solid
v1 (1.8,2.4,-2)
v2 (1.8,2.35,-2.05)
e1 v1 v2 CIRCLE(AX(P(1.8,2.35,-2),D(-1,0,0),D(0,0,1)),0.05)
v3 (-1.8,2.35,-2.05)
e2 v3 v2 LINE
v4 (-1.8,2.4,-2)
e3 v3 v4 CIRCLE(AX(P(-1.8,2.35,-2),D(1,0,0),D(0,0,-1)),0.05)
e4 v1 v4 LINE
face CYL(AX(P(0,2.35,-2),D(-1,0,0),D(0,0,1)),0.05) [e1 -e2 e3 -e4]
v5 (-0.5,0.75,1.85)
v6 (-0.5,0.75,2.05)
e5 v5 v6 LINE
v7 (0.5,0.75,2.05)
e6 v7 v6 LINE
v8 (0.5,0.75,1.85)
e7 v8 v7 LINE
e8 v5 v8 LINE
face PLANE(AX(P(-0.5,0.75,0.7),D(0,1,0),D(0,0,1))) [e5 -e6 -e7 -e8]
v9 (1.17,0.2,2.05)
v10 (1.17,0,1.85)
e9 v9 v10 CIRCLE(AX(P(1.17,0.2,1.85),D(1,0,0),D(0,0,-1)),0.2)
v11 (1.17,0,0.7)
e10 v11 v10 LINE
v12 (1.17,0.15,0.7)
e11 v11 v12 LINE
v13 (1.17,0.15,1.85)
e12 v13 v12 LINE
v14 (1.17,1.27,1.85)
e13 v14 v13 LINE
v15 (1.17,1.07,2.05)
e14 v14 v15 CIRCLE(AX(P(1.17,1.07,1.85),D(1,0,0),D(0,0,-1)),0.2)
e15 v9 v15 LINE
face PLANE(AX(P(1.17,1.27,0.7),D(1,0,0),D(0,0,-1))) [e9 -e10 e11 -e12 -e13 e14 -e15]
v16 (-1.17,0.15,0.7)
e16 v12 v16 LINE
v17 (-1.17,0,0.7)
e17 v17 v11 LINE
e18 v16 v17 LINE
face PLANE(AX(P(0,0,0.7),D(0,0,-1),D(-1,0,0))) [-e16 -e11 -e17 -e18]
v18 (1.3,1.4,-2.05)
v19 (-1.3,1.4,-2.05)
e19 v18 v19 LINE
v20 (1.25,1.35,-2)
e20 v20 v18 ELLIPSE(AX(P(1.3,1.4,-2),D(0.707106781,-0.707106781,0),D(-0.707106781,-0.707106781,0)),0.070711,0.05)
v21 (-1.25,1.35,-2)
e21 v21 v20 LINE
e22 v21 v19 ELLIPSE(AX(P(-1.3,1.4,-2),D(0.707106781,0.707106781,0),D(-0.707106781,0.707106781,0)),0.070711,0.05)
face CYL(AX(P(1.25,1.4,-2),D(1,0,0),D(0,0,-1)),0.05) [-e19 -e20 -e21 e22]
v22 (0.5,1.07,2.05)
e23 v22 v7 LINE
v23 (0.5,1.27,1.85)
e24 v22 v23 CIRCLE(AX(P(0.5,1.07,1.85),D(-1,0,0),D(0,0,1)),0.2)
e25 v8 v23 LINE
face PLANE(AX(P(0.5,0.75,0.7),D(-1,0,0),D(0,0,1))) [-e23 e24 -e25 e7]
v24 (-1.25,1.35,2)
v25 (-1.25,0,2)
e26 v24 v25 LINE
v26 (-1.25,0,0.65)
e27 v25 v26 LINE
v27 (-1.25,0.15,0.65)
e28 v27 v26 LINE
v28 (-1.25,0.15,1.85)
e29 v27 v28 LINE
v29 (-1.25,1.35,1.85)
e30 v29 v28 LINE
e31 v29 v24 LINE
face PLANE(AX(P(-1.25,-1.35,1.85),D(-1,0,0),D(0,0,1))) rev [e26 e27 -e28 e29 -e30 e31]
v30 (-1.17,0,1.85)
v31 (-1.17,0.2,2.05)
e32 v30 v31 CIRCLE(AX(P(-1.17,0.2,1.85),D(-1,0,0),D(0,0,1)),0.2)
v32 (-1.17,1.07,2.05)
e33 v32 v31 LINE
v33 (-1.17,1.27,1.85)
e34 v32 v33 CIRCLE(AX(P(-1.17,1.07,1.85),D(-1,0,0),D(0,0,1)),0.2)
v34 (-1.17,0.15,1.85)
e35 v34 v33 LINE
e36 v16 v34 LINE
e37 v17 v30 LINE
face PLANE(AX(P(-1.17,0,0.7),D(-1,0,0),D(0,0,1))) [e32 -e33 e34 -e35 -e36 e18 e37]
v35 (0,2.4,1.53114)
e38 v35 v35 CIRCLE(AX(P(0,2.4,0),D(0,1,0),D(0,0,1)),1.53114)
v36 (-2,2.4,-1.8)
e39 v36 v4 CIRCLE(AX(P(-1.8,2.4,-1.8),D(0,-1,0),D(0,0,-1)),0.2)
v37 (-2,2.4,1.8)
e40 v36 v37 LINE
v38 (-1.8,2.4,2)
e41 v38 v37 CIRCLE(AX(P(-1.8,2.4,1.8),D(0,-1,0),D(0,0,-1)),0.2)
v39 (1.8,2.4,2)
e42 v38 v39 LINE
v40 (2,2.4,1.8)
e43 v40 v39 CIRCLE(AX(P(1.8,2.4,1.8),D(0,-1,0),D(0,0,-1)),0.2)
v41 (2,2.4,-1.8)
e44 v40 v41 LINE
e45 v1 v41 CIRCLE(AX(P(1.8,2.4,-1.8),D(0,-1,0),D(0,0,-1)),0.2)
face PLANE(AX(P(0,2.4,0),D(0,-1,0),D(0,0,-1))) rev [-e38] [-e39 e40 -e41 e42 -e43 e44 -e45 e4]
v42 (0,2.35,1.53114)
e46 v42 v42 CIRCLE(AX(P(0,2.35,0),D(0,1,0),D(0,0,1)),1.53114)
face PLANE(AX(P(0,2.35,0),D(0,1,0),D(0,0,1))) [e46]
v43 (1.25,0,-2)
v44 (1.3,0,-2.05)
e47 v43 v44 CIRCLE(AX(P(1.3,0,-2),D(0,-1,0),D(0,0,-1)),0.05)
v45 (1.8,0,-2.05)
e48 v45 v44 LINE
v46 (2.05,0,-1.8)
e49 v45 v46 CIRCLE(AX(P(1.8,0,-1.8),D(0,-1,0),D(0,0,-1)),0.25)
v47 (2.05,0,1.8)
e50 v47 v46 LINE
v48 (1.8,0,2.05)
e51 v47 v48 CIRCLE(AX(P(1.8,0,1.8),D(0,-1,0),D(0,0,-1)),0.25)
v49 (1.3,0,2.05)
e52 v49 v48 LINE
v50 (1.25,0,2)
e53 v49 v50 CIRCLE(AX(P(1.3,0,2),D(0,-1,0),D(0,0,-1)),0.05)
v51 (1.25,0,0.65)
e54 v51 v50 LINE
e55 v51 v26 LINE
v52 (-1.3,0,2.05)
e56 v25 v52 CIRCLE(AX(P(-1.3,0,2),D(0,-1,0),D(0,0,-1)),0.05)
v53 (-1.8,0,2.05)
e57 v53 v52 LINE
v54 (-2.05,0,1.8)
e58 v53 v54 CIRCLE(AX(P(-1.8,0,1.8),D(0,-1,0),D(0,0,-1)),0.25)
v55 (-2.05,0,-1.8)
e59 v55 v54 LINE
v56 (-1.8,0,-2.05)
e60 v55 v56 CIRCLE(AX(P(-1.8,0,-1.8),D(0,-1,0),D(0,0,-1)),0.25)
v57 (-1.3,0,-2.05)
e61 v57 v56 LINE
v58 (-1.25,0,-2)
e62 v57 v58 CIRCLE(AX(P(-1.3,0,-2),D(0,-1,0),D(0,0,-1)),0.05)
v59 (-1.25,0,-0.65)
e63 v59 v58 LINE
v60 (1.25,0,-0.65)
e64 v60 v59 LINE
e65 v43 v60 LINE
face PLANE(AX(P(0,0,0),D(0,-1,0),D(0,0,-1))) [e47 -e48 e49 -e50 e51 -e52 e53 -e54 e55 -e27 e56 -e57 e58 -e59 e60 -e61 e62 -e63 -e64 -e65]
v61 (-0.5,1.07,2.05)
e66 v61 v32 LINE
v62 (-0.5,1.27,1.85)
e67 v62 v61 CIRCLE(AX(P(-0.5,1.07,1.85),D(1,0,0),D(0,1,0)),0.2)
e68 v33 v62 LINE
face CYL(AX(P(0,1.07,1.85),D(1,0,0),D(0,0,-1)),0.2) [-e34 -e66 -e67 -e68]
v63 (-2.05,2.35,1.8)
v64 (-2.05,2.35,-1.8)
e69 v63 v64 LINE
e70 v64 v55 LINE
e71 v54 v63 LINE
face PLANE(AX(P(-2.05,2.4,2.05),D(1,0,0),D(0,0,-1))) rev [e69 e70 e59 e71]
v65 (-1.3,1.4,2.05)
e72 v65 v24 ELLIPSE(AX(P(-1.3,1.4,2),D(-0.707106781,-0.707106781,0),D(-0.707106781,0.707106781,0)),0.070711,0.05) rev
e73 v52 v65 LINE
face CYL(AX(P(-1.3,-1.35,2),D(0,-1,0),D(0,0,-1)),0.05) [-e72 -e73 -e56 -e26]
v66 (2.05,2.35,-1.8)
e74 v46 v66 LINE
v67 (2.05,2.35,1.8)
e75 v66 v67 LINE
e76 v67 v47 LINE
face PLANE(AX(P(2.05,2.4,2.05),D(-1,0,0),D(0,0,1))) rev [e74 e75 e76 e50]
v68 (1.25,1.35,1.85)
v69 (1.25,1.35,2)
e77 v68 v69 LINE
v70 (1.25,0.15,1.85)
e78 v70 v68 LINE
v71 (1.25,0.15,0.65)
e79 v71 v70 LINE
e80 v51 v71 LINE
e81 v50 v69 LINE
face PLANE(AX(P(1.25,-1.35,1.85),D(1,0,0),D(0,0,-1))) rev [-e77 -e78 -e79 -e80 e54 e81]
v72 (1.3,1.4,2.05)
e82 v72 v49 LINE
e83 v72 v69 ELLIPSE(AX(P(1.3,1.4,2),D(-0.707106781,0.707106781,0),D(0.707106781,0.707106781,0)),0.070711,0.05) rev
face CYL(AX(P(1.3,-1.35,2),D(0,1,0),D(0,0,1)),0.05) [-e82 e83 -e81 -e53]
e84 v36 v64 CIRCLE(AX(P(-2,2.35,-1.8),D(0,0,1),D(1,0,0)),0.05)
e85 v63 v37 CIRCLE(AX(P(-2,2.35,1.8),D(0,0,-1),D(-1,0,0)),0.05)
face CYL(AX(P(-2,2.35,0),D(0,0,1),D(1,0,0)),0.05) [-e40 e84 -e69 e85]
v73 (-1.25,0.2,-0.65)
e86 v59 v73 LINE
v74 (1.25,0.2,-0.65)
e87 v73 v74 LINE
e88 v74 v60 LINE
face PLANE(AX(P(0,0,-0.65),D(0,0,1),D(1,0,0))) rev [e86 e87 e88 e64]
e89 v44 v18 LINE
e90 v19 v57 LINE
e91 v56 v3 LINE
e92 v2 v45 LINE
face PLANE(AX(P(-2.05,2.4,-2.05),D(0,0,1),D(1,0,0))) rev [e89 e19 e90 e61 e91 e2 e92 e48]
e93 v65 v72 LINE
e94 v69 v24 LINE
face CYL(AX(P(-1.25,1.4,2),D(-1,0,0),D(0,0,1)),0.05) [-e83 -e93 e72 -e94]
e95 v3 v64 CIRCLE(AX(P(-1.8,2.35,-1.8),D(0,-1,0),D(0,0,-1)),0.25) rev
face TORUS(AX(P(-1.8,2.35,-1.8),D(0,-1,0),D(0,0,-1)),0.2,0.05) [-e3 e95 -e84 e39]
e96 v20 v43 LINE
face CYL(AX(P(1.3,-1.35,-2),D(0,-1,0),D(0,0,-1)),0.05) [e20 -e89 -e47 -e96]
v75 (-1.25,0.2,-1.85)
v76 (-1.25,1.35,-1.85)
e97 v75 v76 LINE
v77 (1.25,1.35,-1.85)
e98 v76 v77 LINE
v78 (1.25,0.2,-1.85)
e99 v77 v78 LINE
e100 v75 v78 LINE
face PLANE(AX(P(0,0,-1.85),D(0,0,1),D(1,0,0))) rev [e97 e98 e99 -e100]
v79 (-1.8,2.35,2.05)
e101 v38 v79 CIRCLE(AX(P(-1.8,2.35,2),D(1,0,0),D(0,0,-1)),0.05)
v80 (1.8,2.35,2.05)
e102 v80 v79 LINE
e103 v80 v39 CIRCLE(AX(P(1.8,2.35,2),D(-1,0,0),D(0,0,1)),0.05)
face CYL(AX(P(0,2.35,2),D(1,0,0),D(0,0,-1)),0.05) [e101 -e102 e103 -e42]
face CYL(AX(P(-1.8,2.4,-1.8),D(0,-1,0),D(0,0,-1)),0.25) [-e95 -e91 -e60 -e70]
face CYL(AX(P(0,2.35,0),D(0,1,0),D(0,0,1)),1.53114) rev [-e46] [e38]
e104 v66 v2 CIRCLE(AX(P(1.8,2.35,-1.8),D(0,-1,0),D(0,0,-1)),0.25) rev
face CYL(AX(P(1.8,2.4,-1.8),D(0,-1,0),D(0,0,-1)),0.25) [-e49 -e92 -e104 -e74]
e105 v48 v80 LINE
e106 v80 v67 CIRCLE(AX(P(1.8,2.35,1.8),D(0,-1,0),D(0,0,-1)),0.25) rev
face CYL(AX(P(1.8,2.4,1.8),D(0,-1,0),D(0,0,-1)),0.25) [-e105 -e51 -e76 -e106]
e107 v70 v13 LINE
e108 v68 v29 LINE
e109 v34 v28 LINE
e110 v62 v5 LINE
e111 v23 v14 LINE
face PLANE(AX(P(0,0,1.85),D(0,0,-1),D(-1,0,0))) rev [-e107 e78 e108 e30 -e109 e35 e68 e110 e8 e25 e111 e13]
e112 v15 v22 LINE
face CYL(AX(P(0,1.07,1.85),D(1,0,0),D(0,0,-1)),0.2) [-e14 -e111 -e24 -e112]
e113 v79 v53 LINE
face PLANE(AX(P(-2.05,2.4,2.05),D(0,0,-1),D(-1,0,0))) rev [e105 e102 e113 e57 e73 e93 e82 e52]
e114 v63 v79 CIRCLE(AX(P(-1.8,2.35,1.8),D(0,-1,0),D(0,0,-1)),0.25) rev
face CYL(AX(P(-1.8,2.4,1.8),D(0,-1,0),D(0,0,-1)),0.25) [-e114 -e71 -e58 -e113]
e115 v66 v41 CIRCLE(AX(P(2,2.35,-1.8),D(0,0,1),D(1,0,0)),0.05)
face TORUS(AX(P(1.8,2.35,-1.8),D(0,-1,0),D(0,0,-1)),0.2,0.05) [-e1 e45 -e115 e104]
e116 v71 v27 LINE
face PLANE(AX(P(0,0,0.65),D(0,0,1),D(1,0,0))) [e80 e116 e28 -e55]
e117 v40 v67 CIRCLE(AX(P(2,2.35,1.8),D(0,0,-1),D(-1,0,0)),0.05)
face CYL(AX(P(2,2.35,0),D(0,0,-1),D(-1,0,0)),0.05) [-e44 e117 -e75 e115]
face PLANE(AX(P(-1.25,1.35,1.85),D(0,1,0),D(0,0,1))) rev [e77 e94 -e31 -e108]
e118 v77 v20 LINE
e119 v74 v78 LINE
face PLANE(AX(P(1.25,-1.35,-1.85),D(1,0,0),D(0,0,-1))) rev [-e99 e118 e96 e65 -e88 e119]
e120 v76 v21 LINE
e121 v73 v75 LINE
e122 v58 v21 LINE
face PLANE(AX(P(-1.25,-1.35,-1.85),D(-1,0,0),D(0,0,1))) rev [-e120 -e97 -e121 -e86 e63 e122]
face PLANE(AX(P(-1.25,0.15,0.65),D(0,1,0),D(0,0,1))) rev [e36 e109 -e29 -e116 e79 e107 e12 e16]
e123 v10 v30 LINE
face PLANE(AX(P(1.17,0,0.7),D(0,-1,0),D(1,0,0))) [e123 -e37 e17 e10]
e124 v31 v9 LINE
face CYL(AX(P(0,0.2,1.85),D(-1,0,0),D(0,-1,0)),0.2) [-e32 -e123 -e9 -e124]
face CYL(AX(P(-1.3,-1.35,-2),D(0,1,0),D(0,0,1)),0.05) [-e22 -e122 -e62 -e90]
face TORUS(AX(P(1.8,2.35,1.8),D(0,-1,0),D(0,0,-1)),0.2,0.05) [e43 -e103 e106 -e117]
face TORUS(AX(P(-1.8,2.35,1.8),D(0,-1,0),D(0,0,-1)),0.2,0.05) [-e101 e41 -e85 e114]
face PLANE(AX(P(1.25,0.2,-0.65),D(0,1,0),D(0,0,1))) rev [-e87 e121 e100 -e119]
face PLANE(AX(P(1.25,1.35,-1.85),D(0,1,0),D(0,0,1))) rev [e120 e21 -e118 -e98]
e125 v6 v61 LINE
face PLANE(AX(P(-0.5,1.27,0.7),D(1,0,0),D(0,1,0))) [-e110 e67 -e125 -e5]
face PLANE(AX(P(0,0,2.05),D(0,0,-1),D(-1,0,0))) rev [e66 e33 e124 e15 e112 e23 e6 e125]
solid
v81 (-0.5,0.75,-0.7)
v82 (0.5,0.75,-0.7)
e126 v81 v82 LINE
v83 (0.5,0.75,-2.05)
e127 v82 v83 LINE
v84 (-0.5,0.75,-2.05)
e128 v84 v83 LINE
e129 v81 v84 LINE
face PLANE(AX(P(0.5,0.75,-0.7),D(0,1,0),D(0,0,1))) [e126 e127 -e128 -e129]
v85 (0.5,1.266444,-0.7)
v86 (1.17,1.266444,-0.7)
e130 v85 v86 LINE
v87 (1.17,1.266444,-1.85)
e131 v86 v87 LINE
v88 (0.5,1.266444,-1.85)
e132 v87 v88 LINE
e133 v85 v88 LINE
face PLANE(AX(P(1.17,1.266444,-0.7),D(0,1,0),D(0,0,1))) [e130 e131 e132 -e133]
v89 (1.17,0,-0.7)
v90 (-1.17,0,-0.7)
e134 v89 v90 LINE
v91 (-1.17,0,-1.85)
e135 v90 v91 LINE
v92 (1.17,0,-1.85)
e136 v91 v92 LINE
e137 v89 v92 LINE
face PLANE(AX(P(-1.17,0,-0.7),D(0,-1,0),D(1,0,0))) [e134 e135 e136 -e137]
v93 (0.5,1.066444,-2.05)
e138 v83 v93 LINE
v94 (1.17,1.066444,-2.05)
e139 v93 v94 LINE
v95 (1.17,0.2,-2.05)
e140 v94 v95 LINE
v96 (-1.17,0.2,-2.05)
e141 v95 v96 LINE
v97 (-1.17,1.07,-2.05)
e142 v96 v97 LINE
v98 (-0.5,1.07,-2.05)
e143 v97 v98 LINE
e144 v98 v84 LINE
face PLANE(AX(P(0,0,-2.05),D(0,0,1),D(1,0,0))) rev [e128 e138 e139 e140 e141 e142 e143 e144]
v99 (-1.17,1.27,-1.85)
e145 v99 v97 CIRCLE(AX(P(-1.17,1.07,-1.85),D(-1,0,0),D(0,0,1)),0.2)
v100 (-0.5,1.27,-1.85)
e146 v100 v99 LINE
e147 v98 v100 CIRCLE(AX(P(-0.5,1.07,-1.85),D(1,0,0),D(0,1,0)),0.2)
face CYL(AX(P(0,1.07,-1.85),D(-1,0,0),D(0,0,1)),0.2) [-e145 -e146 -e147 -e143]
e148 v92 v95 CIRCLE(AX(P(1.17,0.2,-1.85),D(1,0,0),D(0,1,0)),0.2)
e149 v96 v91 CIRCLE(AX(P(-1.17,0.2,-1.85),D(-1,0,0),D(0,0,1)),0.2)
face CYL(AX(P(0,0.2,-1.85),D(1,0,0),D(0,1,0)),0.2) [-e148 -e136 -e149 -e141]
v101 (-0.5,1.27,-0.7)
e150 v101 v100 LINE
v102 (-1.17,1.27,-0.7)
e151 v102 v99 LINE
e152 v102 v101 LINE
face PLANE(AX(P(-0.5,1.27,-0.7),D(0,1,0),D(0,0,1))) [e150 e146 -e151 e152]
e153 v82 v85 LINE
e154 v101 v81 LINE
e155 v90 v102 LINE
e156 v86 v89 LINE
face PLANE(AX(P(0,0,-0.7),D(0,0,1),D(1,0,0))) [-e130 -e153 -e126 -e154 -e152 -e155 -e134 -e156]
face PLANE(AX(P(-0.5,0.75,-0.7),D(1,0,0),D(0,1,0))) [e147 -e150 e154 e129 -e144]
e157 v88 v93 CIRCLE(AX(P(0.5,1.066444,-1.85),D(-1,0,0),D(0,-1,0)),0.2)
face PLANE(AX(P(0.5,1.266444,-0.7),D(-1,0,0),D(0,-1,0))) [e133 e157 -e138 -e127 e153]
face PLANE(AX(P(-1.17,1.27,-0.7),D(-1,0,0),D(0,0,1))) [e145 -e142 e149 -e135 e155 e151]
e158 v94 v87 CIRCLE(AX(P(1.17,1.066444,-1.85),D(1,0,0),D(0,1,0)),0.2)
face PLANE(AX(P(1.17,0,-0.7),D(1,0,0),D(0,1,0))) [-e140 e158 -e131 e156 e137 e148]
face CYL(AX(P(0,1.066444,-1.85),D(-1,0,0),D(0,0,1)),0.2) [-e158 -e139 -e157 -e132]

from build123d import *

# Parameters (mm, degrees)
SKETCH_1_W           = 4.1
SKETCH_1_H           = 4.1
EXTRUDE_1_DEPTH      = 2.4
SKETCH_2_W           = 2.5
SKETCH_2_H           = 2.7
CUT_EXTRUDE_1_DEPTH  = 0.2
SKETCH_3_W           = 2.5
SKETCH_3_H           = 0.3
CUT_EXTRUDE_2_DEPTH  = 1.2
SKETCH_4_W           = 2.5
SKETCH_4_H           = 2.7
CUT_EXTRUDE_3_DEPTH  = 0.2
SKETCH_5_W           = 2.5
SKETCH_5_H           = 0.4
CUT_EXTRUDE_4_DEPTH  = 1.2
SKETCH_6_R           = 1.531140145
CUT_EXTRUDE_6_DEPTH  = 0.05
FILLET_3_R           = 0.05
FILLET_4_R           = 0.25
EXTRUDE_2_DEPTH      = 0.2
EXTRUDE_2_DEPTH_BACK = 1.15
EXTRUDE_3_DEPTH      = 0.2
EXTRUDE_3_DEPTH_BACK = 1.15
FILLET_7_R           = 0.2
FILLET_8_R           = 0.2


# Some blends are built 0.0001 mm under size
with BuildPart() as part:
    # Эскиз1 → Бобышка-Вытянуть1 (new body)
    with BuildSketch(Plane(origin=(0, 0, 0), x_dir=(1, 0, 0), z_dir=(0, 1, 0))):
        Rectangle(SKETCH_1_W, SKETCH_1_H)
    extrude(amount=EXTRUDE_1_DEPTH)

    # Эскиз2 → Вырез-Вытянуть1 (cut)
    with BuildSketch(Plane.XY.offset(2.05)):
        Rectangle(SKETCH_2_W, SKETCH_2_H)
    extrude(amount=-CUT_EXTRUDE_1_DEPTH, mode=Mode.SUBTRACT)

    # Эскиз3 → Вырез-Вытянуть2 (cut)
    with BuildSketch(Plane.XY.offset(1.85)):
        Rectangle(SKETCH_3_W, SKETCH_3_H)
    extrude(amount=-CUT_EXTRUDE_2_DEPTH, mode=Mode.SUBTRACT)

    # Эскиз4 → Вырез-Вытянуть3 (cut)
    with BuildSketch(Plane(origin=(0, 0, -2.05), x_dir=(-1, 0, 0), z_dir=(0, 0, -1))):
        Rectangle(SKETCH_4_W, SKETCH_4_H)
    extrude(amount=-CUT_EXTRUDE_3_DEPTH, mode=Mode.SUBTRACT)

    # Эскиз5 → Вырез-Вытянуть4 (cut)
    with BuildSketch(Plane(origin=(0, 0, -1.85), x_dir=(-1, 0, 0), z_dir=(0, 0, -1))):
        Rectangle(SKETCH_5_W, SKETCH_5_H)
    extrude(amount=-CUT_EXTRUDE_4_DEPTH, mode=Mode.SUBTRACT)

    # Эскиз6 → Вырез-Вытянуть6 (cut)
    with BuildSketch(Plane(origin=(0, 2.4, 0), x_dir=(1, 0, 0), z_dir=(0, 1, 0))):
        with Locations(Location((0, 0, 0), (0, 0, 270))):
            Circle(SKETCH_6_R)
    extrude(amount=-CUT_EXTRUDE_6_DEPTH, mode=Mode.SUBTRACT)

    # Скругление3
    fillet_3_edges = [part.edges().sort_by_distance(p)[0] for p in [
        (-2.05, 2.4, 0),
        (0, 2.4, 2.05),
        (-1.25, 0.675, 2.05),
        (1.25, 0.675, 2.05),
        (0, 1.35, 2.05),
        (2.05, 2.4, 0),
        (1.25, 0.675, -2.05),
        (-1.25, 0.675, -2.05),
        (0, 1.35, -2.05),
        (0, 2.4, -2.05),
    ]]
    fillet(fillet_3_edges, radius=FILLET_3_R)

    # Скругление4
    # the kernel refuses this fillet: 0.25 mm, written as the material it takes off along each edge
    with BuildSketch(Plane(origin=(1.8, 2.4, 1.8), x_dir=(0, 0, 1), z_dir=(-1, 0, 0))) as fillet_4_piece_1:
        with BuildLine():
            CenterArc((0.2, -0.05), 0.05, 0, 90)
            Line((0.25, -0.05), (0.25, 0))
            Line((0.25, 0), (0.2, 0))
        make_face()
    revolve(axis=Axis((1.8, 2.4, 1.8), (0, 1, 0)), revolution_arc=90, mode=Mode.SUBTRACT)
    with BuildSketch(Plane(origin=(-1.8, 2.4, 1.8), x_dir=(-1, 0, 0), z_dir=(0, 0, -1))) as fillet_4_piece_2:
        with BuildLine():
            CenterArc((0.2, -0.05), 0.05, 0, 90)
            Line((0.25, -0.05), (0.25, 0))
            Line((0.25, 0), (0.2, 0))
        make_face()
    revolve(axis=Axis((-1.8, 2.4, 1.8), (0, 1, 0)), revolution_arc=90, mode=Mode.SUBTRACT)
    with BuildSketch(Plane(origin=(1.8, 2.4, -1.8), x_dir=(1, 0, 0), z_dir=(0, 0, 1))) as fillet_4_piece_3:
        with BuildLine():
            CenterArc((0.2, -0.05), 0.05, 0, 90)
            Line((0.25, -0.05), (0.25, 0))
            Line((0.25, 0), (0.2, 0))
        make_face()
    revolve(axis=Axis((1.8, 2.4, -1.8), (0, 1, 0)), revolution_arc=90, mode=Mode.SUBTRACT)
    with BuildSketch(Plane(origin=(-1.8, 2.4, -1.8), x_dir=(0, 0, -1), z_dir=(1, 0, 0))) as fillet_4_piece_4:
        with BuildLine():
            CenterArc((0.2, -0.05), 0.05, 0, 90)
            Line((0.25, -0.05), (0.25, 0))
            Line((0.25, 0), (0.2, 0))
        make_face()
    revolve(axis=Axis((-1.8, 2.4, -1.8), (0, 1, 0)), revolution_arc=90, mode=Mode.SUBTRACT)
    with BuildSketch(Plane(origin=(2.05, -0.625, 2.05), x_dir=(-1, 0, 0), z_dir=(0, 1, 0)), Plane(origin=(2.05, -0.625, -2.05), x_dir=(0, 0, 1), z_dir=(0, 1, 0))) as fillet_4_piece_5:
        with BuildLine():
            CenterArc((FILLET_4_R, -FILLET_4_R), FILLET_4_R, 90, 90)
            Line((0, -FILLET_4_R), (0, 0))
            Line((0, 0), (FILLET_4_R, 0))
        make_face()
    extrude(amount=3.025, mode=Mode.SUBTRACT)
    with BuildSketch(Plane(origin=(-2.05, -0.625, 2.05), x_dir=(1, 0, 0), z_dir=(0, 1, 0)), Plane(origin=(-2.05, -0.625, -2.05), x_dir=(0, 0, 1), z_dir=(0, 1, 0))) as fillet_4_piece_6:
        with BuildLine():
            CenterArc((FILLET_4_R, FILLET_4_R), FILLET_4_R, 180, 90)
            Line((0, FILLET_4_R), (0, 0))
            Line((0, 0), (FILLET_4_R, 0))
        make_face()
    extrude(amount=3.025, mode=Mode.SUBTRACT)

    # Эскиз10 → Бобышка-Вытянуть3 (add, two sides: drawn at the far end of the back side and taken through both)
    with BuildSketch(Plane.XY.offset(1.85).offset(-EXTRUDE_3_DEPTH_BACK)):
        Polygon((-1.17, 0), (-1.17, 1.27), (-0.5, 1.27), (-0.5, 0.75), (0.5, 0.75), (0.5, 1.27), (1.17, 1.27), (1.17, 0.2), (1.17, 0), align=None)
    extrude(amount=EXTRUDE_3_DEPTH + EXTRUDE_3_DEPTH_BACK)

    # Скругление7
    fillet_7_edges = [part.edges().sort_by_distance(p)[0] for p in [
        (0, 0, 2.05),
        (-0.835, 1.27, 2.05),
        (0.835, 1.27, 2.05),
    ]]
    fillet(fillet_7_edges, radius=FILLET_7_R - 0.0001)  # a hair under: the kernel refuses the full size


with BuildPart() as body_2:
    # Эскиз8 → Бобышка-Вытянуть2 (new, two sides: drawn at the far end of the back side and taken through both)
    with BuildSketch(Plane(origin=(0, 0, -1.85), x_dir=(-1, 0, 0), z_dir=(0, 0, -1)).offset(-EXTRUDE_2_DEPTH_BACK)):
        Polygon((-1.17, 0), (-1.17, 1.266443577), (-0.5, 1.266443577), (-0.5, 0.75), (0.5, 0.75), (0.5, 1.27), (1.17, 1.27), (1.17, 0.2), (1.17, 0), align=None)
    extrude(amount=EXTRUDE_2_DEPTH + EXTRUDE_2_DEPTH_BACK)

    # Скругление8
    fillet_8_edges = [body_2.edges().sort_by_distance(p)[0] for p in [
        (0, 0, -2.05),
        (-0.835, 1.27, -2.05),
        (0.835, 1.266443577, -2.05),
    ]]
    fillet(fillet_8_edges, radius=FILLET_8_R)


solid = Compound([part.part, body_2.part])
